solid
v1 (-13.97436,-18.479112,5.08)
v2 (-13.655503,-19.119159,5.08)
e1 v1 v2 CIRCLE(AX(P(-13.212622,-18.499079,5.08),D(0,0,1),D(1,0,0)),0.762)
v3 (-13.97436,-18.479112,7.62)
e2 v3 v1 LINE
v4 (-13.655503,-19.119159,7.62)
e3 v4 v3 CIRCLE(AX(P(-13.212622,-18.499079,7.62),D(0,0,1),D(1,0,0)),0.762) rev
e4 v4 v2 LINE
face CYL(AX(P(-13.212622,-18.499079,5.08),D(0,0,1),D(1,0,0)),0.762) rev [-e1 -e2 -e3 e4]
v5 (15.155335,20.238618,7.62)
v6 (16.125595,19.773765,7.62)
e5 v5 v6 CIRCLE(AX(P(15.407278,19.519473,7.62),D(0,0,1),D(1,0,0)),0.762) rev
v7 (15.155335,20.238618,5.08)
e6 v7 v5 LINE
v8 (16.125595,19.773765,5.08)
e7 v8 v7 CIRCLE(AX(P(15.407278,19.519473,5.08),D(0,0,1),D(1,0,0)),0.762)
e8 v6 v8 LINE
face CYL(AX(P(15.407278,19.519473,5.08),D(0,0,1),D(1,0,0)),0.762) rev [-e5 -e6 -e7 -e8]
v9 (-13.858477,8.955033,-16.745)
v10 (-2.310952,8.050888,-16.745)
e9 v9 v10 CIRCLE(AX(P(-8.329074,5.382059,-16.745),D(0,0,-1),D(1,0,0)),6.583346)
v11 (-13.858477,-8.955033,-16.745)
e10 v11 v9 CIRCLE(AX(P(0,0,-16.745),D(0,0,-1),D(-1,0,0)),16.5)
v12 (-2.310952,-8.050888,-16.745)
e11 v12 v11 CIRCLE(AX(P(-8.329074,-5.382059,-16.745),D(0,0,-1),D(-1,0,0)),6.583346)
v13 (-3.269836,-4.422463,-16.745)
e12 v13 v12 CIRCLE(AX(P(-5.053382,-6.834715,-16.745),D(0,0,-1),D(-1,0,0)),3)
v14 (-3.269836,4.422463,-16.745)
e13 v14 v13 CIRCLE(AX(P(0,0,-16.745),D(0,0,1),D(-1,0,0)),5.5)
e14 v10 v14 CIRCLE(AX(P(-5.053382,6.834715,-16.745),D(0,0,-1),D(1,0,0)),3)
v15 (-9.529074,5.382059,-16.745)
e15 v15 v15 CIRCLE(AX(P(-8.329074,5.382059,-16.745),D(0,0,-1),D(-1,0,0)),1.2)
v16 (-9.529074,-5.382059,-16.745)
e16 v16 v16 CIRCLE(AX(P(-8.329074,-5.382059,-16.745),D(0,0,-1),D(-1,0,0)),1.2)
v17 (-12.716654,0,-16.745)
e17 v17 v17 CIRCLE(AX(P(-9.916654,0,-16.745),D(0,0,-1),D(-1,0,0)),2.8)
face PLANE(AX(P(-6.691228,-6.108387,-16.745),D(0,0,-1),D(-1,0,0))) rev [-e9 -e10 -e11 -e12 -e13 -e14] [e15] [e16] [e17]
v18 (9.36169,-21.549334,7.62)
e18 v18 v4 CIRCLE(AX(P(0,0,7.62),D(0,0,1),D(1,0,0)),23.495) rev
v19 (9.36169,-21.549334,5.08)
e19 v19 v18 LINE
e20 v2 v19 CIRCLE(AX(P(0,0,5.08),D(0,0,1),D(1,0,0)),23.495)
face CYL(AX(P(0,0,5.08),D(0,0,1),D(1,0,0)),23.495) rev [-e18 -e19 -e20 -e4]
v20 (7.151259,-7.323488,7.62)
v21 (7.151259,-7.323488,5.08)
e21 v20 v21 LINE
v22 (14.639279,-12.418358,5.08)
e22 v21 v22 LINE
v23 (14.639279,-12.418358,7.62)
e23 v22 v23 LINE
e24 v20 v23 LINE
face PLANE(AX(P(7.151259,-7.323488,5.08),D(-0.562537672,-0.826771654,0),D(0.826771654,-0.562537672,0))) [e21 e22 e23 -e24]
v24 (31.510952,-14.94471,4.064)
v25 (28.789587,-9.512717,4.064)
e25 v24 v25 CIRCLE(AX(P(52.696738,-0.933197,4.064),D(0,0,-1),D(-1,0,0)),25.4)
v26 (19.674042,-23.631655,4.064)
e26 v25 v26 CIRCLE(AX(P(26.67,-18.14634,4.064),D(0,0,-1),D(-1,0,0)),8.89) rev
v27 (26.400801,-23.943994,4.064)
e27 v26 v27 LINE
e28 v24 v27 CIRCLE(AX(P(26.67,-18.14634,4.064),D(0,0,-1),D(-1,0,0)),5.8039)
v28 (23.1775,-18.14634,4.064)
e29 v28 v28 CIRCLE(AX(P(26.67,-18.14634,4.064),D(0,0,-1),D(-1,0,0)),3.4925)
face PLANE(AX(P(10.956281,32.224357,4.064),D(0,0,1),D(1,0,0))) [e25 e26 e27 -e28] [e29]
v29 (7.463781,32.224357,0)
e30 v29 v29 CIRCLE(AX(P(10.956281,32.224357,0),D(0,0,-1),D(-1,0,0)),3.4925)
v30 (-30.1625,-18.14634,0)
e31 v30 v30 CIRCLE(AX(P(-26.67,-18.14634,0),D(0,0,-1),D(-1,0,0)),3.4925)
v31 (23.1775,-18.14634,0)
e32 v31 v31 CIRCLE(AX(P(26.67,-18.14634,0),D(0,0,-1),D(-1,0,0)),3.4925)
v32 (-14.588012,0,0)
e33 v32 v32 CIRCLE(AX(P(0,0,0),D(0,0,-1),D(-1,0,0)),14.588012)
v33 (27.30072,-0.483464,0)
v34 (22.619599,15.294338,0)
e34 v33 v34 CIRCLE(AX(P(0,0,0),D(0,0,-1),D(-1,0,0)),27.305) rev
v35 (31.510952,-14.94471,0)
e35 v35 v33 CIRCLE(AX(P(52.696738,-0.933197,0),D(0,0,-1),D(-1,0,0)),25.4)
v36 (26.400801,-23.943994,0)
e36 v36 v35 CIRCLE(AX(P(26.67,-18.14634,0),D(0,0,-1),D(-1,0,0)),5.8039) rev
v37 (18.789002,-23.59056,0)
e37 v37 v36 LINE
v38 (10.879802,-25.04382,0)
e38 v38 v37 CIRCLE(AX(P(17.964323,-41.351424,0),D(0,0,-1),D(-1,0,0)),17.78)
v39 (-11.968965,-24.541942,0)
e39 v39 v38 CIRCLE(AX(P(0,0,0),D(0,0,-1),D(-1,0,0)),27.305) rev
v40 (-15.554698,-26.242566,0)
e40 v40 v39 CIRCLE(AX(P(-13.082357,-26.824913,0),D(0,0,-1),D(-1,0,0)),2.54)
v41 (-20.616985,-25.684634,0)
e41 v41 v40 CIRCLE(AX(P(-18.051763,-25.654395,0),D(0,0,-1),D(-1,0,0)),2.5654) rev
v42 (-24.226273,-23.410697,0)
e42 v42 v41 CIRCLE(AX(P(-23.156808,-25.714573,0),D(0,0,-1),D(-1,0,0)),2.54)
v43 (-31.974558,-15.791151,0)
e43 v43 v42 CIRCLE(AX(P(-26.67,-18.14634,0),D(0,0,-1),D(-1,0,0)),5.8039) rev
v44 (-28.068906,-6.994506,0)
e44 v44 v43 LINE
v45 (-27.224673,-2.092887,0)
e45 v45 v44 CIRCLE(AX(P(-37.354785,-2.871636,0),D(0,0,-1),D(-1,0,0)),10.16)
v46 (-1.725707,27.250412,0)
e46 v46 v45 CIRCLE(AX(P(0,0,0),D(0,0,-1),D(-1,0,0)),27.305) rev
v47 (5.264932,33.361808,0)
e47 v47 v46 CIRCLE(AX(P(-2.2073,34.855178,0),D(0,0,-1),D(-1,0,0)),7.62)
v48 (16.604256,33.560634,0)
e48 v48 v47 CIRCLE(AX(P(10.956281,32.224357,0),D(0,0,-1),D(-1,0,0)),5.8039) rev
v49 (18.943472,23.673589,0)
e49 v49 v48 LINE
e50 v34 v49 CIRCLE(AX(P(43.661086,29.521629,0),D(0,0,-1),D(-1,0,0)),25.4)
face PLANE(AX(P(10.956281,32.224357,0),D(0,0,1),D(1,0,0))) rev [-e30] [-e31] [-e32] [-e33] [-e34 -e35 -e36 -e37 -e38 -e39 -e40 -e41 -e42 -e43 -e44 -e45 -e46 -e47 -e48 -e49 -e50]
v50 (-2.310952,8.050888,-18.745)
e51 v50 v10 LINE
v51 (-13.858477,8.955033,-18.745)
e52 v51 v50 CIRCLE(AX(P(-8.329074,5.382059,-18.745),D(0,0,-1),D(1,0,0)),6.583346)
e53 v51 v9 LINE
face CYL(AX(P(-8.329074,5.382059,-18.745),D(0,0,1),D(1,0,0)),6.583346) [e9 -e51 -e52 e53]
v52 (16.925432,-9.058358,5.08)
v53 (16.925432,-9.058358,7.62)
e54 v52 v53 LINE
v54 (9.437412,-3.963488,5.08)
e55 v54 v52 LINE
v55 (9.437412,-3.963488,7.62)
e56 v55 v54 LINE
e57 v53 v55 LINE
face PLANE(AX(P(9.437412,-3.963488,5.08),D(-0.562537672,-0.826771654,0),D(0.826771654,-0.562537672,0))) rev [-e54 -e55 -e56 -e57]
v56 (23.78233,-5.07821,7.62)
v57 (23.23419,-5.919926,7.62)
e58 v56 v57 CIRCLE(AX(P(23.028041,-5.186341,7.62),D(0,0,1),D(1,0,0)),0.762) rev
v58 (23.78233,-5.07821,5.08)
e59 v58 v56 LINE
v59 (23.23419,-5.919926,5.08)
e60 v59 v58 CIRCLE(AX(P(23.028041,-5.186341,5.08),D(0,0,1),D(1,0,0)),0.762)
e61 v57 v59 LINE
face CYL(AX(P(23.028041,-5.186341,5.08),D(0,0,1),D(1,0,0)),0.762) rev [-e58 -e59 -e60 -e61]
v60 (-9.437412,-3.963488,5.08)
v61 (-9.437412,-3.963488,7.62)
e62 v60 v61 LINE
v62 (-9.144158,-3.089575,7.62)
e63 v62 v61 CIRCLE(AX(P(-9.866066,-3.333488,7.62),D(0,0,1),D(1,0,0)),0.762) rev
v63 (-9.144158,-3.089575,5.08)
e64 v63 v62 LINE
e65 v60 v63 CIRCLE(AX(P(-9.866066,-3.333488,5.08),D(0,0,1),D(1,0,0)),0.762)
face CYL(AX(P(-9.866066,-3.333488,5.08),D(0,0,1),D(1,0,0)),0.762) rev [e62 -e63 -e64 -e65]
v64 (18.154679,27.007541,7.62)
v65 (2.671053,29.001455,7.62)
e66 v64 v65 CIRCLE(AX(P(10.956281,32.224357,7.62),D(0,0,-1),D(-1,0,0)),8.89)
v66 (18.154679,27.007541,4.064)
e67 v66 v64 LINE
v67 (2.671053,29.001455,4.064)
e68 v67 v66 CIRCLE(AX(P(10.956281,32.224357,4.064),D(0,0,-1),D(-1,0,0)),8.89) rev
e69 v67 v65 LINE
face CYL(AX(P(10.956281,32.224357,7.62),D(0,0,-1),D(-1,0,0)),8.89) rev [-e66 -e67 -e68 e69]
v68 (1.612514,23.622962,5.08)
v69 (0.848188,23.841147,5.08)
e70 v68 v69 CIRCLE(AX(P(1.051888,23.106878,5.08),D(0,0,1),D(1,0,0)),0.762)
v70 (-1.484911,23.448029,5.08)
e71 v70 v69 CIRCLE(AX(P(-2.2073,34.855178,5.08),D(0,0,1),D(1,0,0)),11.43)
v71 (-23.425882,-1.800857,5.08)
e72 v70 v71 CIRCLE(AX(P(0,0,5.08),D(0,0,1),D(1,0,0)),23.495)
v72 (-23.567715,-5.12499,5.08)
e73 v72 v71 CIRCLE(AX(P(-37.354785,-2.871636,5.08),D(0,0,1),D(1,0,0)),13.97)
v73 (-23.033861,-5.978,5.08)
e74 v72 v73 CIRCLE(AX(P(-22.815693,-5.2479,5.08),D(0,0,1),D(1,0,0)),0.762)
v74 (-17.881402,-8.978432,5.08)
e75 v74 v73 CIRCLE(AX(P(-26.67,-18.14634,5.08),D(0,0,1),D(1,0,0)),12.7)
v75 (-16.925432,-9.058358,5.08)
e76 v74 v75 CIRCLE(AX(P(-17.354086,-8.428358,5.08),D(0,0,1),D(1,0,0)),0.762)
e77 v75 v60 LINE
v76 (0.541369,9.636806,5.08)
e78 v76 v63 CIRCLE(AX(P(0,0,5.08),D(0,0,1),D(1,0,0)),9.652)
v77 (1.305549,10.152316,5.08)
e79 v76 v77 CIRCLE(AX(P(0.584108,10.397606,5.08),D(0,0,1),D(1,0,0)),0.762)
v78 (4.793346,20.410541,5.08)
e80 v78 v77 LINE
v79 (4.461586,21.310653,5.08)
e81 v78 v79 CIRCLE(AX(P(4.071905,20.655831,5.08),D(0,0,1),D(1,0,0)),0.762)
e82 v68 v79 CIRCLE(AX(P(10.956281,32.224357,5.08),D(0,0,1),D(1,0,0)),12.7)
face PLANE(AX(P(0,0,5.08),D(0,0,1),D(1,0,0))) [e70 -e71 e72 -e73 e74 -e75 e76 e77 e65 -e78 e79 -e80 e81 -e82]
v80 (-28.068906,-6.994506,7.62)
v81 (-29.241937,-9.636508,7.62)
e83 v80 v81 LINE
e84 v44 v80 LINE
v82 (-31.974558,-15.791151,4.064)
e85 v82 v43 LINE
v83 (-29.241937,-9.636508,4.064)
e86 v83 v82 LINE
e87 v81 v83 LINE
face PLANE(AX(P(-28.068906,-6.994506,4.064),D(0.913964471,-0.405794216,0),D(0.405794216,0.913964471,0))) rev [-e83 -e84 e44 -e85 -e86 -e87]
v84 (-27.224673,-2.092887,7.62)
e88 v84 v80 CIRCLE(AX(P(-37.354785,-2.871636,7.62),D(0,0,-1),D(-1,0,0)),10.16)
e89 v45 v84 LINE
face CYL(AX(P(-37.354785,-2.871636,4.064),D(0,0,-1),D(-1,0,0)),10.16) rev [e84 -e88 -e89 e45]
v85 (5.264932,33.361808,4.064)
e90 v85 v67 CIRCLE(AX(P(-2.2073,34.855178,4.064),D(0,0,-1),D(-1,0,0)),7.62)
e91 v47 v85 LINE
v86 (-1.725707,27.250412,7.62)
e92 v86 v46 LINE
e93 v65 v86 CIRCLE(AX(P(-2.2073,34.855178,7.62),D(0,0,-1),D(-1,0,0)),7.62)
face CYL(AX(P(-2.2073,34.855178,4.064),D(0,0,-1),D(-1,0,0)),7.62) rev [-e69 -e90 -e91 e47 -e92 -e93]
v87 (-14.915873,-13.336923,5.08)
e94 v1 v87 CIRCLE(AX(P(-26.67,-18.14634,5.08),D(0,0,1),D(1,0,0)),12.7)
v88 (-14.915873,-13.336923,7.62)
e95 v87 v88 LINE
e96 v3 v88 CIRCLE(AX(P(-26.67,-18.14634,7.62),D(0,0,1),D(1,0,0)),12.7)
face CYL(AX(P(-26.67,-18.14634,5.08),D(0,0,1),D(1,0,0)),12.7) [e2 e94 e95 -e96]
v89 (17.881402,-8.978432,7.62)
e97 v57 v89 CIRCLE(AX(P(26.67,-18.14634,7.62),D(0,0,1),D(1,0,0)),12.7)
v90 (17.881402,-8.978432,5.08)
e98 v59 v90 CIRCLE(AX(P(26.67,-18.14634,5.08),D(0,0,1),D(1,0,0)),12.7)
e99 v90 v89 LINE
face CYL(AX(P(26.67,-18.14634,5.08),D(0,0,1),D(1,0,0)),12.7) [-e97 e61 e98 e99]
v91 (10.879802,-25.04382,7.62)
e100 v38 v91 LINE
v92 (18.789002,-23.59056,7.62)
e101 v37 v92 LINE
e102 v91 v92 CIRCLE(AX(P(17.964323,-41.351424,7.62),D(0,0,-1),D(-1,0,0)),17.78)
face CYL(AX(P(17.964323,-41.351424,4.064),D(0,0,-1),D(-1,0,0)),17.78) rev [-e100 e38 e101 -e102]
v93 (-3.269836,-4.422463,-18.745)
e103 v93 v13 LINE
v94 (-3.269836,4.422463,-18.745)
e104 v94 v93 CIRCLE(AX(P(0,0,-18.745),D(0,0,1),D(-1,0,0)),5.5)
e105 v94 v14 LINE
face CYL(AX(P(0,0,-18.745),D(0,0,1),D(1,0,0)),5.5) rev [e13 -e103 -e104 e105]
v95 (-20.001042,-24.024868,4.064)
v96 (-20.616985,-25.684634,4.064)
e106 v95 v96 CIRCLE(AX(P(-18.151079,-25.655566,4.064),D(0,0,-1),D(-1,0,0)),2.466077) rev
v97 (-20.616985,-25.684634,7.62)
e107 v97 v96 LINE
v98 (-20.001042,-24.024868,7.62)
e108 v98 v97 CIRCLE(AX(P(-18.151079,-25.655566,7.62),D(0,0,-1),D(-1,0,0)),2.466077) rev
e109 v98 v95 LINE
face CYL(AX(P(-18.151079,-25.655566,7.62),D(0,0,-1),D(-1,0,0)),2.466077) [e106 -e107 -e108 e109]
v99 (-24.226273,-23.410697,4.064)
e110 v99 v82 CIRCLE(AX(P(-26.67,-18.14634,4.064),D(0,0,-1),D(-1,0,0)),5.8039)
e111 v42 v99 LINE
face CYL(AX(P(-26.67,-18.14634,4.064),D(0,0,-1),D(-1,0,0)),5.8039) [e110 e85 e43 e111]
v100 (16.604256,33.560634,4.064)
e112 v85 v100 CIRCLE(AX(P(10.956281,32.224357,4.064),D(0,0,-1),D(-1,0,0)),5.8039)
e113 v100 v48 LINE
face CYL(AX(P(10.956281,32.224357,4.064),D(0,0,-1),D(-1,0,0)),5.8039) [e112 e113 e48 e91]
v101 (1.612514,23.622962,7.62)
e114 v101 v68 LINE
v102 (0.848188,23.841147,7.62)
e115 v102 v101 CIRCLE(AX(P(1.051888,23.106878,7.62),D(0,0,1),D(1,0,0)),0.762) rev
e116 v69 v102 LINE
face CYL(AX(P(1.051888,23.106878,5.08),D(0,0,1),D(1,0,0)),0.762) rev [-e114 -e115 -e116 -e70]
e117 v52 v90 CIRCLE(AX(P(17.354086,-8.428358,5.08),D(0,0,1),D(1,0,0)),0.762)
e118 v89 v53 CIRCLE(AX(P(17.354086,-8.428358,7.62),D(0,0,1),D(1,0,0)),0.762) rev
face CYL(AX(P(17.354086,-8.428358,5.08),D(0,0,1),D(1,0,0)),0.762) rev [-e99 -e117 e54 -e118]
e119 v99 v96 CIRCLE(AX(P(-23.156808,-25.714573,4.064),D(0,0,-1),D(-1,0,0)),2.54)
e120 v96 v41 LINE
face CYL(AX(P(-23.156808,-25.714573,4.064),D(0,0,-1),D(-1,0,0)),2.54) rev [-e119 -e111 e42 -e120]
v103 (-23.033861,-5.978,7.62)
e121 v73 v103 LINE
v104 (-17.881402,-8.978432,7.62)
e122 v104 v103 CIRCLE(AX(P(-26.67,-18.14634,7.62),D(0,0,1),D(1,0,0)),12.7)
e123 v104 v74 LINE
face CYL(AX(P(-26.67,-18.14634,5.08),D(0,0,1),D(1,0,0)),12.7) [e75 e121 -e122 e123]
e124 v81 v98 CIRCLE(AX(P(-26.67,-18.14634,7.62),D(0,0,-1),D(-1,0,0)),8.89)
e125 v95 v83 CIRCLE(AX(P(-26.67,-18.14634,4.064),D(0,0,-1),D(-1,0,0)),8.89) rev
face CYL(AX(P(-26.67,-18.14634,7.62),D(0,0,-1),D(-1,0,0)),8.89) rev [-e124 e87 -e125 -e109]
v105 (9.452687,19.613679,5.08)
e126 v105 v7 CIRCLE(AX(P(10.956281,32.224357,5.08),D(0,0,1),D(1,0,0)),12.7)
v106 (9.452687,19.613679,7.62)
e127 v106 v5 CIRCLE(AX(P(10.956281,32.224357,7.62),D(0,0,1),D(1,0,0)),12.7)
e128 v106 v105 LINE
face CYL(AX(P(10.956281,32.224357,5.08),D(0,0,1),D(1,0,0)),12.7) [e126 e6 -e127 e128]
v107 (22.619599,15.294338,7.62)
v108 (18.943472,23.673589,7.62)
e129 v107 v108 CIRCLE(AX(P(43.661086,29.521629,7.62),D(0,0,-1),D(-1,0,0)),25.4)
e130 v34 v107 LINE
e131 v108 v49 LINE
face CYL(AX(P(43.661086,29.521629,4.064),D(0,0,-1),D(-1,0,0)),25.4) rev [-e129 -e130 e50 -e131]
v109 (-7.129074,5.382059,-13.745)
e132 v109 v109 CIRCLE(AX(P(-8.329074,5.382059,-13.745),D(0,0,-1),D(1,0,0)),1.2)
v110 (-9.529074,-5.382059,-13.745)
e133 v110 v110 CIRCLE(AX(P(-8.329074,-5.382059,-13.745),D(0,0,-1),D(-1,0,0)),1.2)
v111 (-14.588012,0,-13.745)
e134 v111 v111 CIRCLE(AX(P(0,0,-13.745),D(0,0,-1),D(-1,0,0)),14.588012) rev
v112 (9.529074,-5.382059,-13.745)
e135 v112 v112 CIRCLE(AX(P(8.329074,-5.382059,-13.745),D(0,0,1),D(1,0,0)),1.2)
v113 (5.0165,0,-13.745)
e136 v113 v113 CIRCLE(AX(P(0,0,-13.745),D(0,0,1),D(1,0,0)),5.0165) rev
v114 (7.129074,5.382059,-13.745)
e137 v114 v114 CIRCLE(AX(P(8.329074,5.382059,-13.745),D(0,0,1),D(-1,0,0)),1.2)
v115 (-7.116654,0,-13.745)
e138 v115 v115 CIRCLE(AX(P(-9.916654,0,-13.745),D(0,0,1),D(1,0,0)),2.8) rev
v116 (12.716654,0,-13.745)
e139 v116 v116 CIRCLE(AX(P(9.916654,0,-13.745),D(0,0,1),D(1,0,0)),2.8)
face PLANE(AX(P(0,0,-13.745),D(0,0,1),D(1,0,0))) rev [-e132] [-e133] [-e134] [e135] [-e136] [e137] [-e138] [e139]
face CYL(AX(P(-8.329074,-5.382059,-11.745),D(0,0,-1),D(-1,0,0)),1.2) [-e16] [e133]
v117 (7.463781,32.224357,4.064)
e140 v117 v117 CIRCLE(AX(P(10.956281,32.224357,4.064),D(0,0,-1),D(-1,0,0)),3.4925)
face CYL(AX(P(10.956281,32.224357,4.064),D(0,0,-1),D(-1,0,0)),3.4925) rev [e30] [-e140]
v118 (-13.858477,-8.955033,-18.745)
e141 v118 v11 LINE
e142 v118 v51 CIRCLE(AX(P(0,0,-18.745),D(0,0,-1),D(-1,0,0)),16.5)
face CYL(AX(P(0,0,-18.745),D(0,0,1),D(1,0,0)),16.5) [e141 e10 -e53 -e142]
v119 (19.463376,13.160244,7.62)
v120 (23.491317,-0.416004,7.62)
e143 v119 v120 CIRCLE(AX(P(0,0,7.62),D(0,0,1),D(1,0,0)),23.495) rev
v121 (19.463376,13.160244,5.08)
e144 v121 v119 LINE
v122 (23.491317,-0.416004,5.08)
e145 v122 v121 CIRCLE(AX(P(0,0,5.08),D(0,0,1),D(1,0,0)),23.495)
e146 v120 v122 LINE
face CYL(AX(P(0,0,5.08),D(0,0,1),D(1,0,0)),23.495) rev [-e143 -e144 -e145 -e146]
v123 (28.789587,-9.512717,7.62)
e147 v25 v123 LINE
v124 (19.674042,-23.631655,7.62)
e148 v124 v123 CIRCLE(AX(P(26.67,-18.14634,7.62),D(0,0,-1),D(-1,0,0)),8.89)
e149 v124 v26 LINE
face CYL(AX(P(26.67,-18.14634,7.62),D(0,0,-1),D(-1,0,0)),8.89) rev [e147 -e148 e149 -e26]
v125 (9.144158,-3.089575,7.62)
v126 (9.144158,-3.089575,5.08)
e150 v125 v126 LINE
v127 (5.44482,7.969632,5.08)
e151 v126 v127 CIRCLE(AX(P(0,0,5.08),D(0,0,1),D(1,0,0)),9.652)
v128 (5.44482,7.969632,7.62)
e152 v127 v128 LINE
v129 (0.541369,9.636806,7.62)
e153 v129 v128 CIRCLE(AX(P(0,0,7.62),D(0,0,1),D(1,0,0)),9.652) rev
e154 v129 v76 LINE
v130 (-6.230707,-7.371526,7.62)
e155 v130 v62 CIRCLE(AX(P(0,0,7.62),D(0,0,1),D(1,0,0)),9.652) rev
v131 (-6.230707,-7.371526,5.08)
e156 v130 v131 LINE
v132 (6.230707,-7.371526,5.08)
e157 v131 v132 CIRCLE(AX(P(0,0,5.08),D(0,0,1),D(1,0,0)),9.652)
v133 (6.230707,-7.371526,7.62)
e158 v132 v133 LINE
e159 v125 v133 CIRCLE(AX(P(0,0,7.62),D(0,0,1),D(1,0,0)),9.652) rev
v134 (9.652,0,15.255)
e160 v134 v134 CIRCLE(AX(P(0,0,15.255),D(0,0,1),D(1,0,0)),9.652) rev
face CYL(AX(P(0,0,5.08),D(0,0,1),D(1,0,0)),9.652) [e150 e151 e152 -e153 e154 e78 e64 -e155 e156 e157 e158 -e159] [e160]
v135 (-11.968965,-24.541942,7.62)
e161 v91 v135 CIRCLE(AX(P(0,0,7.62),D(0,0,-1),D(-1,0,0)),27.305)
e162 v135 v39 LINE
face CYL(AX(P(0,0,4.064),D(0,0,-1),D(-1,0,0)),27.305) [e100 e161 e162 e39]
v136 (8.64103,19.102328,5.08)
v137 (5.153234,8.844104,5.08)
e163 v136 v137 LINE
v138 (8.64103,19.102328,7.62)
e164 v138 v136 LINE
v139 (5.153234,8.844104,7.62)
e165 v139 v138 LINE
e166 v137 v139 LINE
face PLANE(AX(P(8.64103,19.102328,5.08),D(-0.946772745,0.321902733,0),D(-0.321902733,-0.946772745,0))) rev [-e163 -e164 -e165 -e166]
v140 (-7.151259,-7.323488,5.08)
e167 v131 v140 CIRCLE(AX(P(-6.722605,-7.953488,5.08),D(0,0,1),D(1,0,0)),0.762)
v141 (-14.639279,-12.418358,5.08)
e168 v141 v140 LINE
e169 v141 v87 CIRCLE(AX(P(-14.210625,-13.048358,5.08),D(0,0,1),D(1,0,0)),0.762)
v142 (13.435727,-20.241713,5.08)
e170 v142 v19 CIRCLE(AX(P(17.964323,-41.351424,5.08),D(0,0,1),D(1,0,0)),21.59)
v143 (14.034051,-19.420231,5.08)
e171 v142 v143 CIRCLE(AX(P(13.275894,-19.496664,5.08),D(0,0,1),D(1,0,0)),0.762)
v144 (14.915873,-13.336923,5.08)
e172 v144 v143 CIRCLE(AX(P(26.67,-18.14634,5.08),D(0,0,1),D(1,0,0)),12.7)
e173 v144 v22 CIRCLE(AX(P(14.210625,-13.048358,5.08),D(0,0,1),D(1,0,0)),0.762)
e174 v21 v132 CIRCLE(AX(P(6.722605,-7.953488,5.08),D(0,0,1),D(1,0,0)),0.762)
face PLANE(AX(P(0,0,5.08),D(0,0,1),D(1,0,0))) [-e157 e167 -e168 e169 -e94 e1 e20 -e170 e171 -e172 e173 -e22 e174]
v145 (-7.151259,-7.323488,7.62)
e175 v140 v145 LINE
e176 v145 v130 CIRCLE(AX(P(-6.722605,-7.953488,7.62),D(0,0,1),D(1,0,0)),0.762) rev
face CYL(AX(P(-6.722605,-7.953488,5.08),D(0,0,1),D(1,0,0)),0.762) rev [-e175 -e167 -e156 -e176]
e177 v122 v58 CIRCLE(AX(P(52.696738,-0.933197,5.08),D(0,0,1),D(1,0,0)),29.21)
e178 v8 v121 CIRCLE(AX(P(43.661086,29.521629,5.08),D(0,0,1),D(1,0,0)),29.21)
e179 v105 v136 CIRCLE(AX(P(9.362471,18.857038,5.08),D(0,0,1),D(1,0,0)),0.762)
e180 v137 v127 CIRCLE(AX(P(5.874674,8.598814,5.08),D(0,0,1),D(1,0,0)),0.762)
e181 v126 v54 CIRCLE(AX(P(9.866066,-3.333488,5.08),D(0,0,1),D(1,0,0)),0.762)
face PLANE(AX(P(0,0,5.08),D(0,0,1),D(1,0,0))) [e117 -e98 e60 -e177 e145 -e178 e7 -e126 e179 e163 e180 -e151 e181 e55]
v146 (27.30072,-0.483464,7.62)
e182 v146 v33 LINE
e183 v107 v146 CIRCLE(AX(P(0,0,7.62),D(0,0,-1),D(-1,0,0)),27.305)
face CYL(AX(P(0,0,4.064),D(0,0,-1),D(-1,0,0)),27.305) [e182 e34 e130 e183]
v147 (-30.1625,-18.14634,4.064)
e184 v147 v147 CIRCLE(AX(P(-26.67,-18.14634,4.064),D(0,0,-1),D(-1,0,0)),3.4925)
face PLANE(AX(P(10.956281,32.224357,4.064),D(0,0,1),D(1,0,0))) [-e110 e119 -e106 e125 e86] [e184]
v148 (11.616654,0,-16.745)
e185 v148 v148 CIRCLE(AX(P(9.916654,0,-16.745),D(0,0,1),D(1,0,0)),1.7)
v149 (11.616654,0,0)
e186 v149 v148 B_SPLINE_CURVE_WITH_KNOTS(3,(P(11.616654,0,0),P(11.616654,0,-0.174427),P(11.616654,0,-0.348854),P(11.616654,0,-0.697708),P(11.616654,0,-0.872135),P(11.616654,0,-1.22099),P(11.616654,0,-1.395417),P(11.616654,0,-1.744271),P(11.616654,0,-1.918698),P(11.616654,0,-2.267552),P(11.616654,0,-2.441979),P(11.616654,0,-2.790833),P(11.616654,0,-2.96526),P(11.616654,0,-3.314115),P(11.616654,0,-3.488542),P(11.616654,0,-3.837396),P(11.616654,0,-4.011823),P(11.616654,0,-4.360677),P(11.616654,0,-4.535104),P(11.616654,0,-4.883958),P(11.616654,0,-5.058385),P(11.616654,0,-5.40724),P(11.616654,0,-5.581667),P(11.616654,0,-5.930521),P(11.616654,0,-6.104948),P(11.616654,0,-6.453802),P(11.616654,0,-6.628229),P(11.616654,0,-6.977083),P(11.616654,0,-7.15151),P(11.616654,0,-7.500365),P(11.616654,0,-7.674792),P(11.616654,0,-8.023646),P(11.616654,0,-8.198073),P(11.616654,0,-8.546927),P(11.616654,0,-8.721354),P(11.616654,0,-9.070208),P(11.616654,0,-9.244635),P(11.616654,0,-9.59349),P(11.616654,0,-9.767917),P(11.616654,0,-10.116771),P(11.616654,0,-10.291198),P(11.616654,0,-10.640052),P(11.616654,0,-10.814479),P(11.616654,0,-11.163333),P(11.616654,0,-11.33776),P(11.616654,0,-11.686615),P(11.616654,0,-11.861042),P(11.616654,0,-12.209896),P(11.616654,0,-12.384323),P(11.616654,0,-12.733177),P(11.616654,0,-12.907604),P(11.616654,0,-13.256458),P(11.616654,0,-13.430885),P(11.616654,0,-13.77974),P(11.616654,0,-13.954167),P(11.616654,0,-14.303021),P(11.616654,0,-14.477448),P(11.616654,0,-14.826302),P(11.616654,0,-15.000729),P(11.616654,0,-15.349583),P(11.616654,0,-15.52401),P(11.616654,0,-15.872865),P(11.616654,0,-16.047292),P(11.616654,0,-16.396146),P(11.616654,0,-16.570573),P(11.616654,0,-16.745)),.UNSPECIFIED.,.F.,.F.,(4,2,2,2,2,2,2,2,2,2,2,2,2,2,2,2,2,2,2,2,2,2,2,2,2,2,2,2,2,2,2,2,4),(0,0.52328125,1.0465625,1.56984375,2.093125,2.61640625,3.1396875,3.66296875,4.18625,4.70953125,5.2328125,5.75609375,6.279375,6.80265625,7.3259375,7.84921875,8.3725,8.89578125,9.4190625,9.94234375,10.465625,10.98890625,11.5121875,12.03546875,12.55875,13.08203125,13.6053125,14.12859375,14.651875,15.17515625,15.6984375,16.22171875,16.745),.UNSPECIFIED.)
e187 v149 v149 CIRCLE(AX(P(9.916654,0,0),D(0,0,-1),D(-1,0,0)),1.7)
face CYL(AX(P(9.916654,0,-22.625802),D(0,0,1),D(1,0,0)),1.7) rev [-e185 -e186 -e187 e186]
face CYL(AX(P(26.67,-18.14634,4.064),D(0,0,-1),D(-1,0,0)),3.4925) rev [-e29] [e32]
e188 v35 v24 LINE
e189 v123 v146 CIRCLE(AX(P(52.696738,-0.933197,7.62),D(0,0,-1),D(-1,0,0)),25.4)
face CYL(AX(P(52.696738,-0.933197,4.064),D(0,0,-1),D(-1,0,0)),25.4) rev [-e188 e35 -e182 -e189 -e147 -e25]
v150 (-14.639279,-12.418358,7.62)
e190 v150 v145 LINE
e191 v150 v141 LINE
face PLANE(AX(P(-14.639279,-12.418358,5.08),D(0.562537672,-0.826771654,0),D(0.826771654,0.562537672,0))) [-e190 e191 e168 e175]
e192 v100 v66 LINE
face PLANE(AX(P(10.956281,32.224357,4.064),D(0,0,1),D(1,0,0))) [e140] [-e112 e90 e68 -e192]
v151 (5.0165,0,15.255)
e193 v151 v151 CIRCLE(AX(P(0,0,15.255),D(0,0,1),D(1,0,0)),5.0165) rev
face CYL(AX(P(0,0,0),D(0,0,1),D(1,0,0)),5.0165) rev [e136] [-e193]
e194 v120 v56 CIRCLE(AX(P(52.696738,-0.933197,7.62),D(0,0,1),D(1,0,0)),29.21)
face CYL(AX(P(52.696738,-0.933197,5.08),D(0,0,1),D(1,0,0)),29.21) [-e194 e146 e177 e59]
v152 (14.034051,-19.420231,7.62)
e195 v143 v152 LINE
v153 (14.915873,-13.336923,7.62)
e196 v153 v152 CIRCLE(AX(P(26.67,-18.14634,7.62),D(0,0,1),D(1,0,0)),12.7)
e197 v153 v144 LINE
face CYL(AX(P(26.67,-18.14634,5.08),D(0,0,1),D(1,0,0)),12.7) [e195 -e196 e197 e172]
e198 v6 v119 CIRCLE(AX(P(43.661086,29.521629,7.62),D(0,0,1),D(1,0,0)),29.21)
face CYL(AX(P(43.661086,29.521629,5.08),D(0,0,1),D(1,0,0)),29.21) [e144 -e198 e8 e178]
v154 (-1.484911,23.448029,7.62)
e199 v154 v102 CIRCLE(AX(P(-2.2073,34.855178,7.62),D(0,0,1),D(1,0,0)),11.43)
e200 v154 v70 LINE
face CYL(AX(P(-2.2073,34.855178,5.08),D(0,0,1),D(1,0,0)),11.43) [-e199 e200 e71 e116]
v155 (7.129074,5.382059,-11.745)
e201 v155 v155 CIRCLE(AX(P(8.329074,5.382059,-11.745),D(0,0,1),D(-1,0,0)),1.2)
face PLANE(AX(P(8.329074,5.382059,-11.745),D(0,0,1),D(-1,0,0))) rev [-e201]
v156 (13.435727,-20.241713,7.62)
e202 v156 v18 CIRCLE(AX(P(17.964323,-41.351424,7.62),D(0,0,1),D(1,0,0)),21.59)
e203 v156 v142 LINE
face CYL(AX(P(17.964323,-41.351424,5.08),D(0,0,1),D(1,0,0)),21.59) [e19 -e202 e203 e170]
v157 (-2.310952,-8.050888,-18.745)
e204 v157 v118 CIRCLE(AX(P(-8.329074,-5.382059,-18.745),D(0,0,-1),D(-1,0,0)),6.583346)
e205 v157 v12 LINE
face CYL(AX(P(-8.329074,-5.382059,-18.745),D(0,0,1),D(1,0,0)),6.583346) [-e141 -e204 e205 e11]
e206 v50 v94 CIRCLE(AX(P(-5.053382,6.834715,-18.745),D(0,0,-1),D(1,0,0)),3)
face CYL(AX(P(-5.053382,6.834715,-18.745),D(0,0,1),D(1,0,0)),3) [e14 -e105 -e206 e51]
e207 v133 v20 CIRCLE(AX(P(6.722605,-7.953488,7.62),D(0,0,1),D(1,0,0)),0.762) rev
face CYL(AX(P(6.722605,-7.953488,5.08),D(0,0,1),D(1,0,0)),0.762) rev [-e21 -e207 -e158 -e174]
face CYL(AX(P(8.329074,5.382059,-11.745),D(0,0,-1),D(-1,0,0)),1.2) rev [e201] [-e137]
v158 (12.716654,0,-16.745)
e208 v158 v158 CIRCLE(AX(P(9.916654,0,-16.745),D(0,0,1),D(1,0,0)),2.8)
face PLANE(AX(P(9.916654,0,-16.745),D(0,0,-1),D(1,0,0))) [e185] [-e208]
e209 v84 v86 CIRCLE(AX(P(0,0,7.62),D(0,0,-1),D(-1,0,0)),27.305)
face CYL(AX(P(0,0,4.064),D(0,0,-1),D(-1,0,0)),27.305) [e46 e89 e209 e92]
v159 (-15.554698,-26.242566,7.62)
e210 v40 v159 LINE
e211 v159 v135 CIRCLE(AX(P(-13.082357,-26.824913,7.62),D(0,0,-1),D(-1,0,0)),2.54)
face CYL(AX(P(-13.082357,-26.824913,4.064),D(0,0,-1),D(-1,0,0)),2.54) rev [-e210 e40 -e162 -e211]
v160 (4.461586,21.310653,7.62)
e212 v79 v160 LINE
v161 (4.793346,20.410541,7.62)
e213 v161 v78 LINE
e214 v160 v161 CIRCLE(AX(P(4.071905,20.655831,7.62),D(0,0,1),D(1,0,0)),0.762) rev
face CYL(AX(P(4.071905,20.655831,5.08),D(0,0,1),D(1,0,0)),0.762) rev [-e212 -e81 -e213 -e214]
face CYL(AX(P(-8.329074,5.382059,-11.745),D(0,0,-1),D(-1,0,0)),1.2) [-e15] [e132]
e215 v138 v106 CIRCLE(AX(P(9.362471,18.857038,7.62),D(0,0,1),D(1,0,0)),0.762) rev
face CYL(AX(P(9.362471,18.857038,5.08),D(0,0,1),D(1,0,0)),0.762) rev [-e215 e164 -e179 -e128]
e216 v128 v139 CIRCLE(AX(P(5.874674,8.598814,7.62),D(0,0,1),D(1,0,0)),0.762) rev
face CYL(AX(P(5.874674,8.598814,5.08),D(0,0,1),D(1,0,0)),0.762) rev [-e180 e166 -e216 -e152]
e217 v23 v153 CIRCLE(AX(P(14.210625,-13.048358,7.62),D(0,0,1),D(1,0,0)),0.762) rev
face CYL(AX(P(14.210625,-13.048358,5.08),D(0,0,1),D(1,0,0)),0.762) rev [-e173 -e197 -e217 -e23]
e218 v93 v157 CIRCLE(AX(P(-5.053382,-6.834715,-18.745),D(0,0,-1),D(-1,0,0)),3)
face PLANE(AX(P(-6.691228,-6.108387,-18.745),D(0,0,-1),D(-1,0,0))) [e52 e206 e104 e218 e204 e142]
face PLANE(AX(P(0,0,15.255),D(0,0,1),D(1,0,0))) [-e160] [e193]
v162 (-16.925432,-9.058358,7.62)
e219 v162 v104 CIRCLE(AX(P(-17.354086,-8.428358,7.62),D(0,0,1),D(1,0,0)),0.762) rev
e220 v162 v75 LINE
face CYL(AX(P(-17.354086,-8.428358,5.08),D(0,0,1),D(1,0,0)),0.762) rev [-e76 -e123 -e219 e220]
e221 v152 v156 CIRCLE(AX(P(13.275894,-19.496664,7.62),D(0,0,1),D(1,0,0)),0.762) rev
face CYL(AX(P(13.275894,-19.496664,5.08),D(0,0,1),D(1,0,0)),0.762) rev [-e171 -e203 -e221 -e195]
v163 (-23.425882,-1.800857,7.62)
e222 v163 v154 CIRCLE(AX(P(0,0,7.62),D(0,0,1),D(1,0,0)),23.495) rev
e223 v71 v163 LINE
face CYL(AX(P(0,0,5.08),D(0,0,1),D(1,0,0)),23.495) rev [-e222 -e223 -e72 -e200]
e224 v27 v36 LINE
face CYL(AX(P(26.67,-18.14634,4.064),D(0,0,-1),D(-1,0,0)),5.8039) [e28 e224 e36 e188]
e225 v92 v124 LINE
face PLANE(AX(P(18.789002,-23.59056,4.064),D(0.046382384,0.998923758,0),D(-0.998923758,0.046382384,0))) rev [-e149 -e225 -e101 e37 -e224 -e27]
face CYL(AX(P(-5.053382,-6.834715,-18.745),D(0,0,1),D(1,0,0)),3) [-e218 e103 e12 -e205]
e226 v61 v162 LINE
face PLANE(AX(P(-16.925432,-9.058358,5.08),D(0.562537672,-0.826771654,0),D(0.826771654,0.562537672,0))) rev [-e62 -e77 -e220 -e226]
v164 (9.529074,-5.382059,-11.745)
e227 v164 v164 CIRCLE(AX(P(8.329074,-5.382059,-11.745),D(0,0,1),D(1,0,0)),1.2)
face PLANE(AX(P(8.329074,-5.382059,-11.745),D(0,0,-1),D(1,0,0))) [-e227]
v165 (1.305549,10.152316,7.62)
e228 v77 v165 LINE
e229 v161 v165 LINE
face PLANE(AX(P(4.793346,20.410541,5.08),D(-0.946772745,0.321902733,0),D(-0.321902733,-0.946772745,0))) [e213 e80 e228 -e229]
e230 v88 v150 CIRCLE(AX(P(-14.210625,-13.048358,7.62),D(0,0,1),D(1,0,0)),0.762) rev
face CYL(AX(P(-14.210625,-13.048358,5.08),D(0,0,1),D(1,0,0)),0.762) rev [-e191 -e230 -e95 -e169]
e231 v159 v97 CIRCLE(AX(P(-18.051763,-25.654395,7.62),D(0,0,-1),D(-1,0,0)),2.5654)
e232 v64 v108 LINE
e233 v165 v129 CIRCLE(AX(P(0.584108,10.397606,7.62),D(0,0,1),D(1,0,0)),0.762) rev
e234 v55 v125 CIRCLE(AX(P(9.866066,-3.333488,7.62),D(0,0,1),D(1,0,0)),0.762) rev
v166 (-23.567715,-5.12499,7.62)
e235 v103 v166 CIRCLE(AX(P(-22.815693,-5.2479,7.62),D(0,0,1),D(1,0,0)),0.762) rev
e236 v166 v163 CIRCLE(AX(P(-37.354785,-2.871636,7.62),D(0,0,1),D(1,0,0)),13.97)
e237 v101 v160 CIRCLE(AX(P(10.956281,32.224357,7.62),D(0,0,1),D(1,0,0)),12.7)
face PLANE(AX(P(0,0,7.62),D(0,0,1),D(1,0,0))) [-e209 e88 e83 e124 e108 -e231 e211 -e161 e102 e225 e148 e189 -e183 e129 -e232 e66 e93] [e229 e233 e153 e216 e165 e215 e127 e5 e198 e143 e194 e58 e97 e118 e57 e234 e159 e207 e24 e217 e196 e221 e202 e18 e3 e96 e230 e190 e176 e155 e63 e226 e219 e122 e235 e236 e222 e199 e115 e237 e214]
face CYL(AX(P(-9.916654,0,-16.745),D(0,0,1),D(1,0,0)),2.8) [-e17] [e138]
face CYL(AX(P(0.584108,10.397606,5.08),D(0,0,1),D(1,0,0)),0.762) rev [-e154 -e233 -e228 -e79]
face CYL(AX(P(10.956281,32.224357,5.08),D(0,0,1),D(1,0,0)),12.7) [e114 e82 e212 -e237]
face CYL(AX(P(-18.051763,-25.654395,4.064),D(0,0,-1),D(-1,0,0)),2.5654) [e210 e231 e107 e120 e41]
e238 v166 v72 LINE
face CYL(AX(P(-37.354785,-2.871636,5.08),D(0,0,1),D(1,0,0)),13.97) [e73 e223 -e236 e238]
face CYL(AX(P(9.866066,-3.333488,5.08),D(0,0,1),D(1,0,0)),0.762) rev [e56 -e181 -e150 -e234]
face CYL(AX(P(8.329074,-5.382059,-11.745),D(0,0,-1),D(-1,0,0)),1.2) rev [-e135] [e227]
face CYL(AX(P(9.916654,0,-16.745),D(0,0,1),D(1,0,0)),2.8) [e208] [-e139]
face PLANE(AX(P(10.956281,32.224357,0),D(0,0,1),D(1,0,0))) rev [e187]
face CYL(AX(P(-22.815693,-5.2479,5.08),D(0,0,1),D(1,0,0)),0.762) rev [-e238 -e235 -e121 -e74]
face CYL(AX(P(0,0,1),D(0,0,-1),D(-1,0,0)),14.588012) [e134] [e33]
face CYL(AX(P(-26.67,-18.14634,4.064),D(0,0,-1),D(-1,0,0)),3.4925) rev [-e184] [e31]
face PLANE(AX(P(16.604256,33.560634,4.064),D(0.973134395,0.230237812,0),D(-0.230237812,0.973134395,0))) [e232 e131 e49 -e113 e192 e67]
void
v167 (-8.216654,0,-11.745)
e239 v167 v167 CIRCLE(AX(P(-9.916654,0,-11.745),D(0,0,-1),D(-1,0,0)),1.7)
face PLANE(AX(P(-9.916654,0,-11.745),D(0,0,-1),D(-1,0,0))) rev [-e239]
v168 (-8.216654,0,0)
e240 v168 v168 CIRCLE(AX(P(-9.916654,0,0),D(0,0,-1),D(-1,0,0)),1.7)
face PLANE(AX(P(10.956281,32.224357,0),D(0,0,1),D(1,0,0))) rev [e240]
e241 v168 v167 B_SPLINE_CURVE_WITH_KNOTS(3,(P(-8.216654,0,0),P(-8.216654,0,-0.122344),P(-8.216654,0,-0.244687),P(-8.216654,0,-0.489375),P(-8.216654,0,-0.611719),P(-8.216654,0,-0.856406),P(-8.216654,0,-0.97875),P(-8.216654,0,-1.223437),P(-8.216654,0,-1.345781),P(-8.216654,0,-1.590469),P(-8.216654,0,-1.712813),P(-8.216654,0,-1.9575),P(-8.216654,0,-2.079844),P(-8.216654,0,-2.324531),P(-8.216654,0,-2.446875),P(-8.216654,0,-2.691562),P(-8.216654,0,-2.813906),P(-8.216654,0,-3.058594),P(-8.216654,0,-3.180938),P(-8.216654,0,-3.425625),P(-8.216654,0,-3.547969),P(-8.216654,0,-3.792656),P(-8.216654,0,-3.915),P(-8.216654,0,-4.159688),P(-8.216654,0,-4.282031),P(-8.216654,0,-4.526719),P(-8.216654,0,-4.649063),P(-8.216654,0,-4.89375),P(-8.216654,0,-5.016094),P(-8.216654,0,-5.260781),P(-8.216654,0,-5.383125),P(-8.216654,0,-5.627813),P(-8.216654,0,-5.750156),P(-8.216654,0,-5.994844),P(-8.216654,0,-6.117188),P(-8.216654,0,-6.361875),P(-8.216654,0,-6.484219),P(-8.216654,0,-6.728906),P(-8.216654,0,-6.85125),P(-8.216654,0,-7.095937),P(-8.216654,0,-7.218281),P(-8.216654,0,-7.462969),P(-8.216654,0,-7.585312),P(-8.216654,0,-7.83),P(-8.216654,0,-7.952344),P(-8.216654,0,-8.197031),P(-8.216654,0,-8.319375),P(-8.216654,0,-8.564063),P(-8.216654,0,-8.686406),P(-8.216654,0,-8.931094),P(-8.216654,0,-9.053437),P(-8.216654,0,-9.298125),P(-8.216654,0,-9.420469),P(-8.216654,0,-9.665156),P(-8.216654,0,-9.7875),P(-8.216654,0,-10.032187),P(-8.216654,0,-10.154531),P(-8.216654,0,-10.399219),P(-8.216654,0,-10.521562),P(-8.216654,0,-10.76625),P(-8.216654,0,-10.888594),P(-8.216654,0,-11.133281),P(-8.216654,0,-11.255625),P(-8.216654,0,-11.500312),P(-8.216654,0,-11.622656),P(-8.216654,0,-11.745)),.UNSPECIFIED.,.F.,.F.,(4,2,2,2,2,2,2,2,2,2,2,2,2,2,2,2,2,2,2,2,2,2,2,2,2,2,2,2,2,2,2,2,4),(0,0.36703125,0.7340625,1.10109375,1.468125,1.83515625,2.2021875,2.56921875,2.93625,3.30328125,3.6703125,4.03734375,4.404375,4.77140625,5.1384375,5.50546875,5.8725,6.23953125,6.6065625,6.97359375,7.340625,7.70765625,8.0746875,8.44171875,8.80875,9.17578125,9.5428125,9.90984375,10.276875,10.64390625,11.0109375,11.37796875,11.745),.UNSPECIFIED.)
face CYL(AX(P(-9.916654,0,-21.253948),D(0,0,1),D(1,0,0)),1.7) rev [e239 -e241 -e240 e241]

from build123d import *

# Parameters (mm, degrees)
EXTRUDE_START           = -5.08
EXTRUDE_1_OUTLINE_R     = 5.0165
EXTRUDE_1_DEPTH         = 5.08
EXTRUDE_1_2_OUTLINE_R   = 14.588011588
EXTRUDE_1_2_OUTLINE_R_2 = 2.268804718
EXTRUDE_1_2_OUTLINE_R_3 = 5.0165
EXTRUDE_1_2_OUTLINE_R_4 = 1.7
EXTRUDE_1_2_DEPTH       = 13.745
EXTRUDE_START_2         = -7.62
EXTRUDE_1_3_OUTLINE_R   = 5.0165
EXTRUDE_1_3_DEPTH       = 2.54
EXTRUDE_START_3         = -15.255
EXTRUDE_1_4_OUTLINE_R   = 9.652
EXTRUDE_1_4_OUTLINE_R_2 = 5.0165
EXTRUDE_1_4_DEPTH       = 7.635
EXTRUDE_START_4         = -4.064
EXTRUDE_1_5_OUTLINE_R   = 3.4925
EXTRUDE_1_5_DEPTH       = 4.064
SKETCH_2_R              = 3.139837575
SKETCH_2_R_2            = 1.7
EXTRUDE_2_DEPTH         = 13.745
SKETCH_3_R              = 1.2
CUT_EXTRUDE_1_DEPTH     = 2
SKETCH_4_R              = 2.8
SKETCH_4_R_2            = 1.7
EXTRUDE_3_DEPTH         = 3
SKETCH_5_R              = 1.7
SKETCH_5_R_2            = 1.2
EXTRUDE_4_DEPTH         = 5
EXTRUDE_5_DEPTH         = 2


with BuildPart() as part:
    # 凸台-拉伸1: read off the stored shape, not the designer's step
    # 凸台-拉伸1 outline → 凸台-拉伸1 (new body)
    with BuildSketch(Plane(origin=(0, 0, 0), x_dir=(-1, 0, 0), z_dir=(0, 0, -1)).offset(EXTRUDE_START)):
        with BuildLine():
            ThreePointArc((20.001041548, -24.024868384), (19.189851545, -13.342229592), (29.241937464, -9.636508412))
            Line((29.241937464, -9.636508412), (28.068905544, -6.994505511))
            ThreePointArc((28.068905544, -6.994505511), (27.342210837, -4.596155707), (27.224673499, -2.092887453))
            ThreePointArc((27.224673499, -2.092887453), (20.610396453, 17.910180989), (1.725707135, 27.250412105))
            ThreePointArc((1.725707135, 27.250412105), (-0.612060573, 27.775940536), (-2.671053319, 29.001455474))
            ThreePointArc((-2.671053319, 29.001455474), (-9.820841475, 23.407165066), (-18.154679086, 27.007540952))
            Line((-18.154679086, 27.007540952), (-18.943472312, 23.673588932))
            ThreePointArc((-18.943472312, 23.673588932), (-20.401103388, 19.31706117), (-22.619598737, 15.294338102))
            ThreePointArc((-22.619598737, 15.294338102), (-26.177171365, 7.766513011), (-27.300719551, -0.483463539))
            ThreePointArc((-27.300719551, -0.483463539), (-27.635164342, -5.065694963), (-28.789587413, -9.512717058))
            ThreePointArc((-28.789587413, -9.512717058), (-19.201342403, -13.324384855), (-19.674042111, -23.631654559))
            Line((-19.674042111, -23.631654559), (-18.789002246, -23.590560073))
            ThreePointArc((-18.789002246, -23.590560073), (-14.751162948, -23.864172006), (-10.879801534, -25.043820467))
            ThreePointArc((-10.879801534, -25.043820467), (0.599616353, -27.298415434), (11.968964894, -24.54194174))
            ThreePointArc((11.968964894, -24.54194174), (14.170803819, -24.529943899), (15.554698359, -26.242566013))
            ThreePointArc((15.554698359, -26.242566013), (18.332802908, -28.204355062), (20.616984936, -25.68463412))
            ThreePointArc((20.616984936, -25.68463412), (20.463088042, -24.797573692), (20.001041548, -24.024868384))
        make_face()
        Circle(EXTRUDE_1_OUTLINE_R, mode=Mode.SUBTRACT)
    extrude(amount=EXTRUDE_1_DEPTH)

    # Extrude 1 2 outline → Extrude 1 2 (add)
    with BuildSketch(Plane(origin=(0, 0, 0), x_dir=(-1, 0, 0), z_dir=(0, 0, -1))):
        Circle(EXTRUDE_1_2_OUTLINE_R)
        with Locations((-9.916654285, 0)):
            Circle(EXTRUDE_1_2_OUTLINE_R_2, mode=Mode.SUBTRACT)
        Circle(EXTRUDE_1_2_OUTLINE_R_3, mode=Mode.SUBTRACT)
        with Locations((9.916654285, 0)):
            Circle(EXTRUDE_1_2_OUTLINE_R_4, mode=Mode.SUBTRACT)
    extrude(amount=EXTRUDE_1_2_DEPTH)

    # Extrude 1 3 outline → Extrude 1 3 (add)
    with BuildSketch(Plane(origin=(0, 0, 0), x_dir=(-1, 0, 0), z_dir=(0, 0, -1)).offset(EXTRUDE_START_2)):
        with BuildLine():
            ThreePointArc((20.001041548, -24.024868384), (19.189851545, -13.342229592), (29.241937464, -9.636508412))
            Line((29.241937464, -9.636508412), (28.068905544, -6.994505511))
            ThreePointArc((28.068905544, -6.994505511), (27.342210837, -4.596155707), (27.224673499, -2.092887453))
            ThreePointArc((27.224673499, -2.092887453), (20.610396453, 17.910180989), (1.725707135, 27.250412105))
            ThreePointArc((1.725707135, 27.250412105), (-0.612060573, 27.775940536), (-2.671053319, 29.001455474))
            ThreePointArc((-2.671053319, 29.001455474), (-9.820841475, 23.407165066), (-18.154679086, 27.007540952))
            Line((-18.154679086, 27.007540952), (-18.943472312, 23.673588932))
            ThreePointArc((-18.943472312, 23.673588932), (-20.401103388, 19.31706117), (-22.619598737, 15.294338102))
            ThreePointArc((-22.619598737, 15.294338102), (-26.177171365, 7.766513011), (-27.300719551, -0.483463539))
            ThreePointArc((-27.300719551, -0.483463539), (-27.635164342, -5.065694963), (-28.789587413, -9.512717058))
            ThreePointArc((-28.789587413, -9.512717058), (-19.201342403, -13.324384855), (-19.674042111, -23.631654559))
            Line((-19.674042111, -23.631654559), (-18.789002246, -23.590560073))
            ThreePointArc((-18.789002246, -23.590560073), (-14.751162948, -23.864172006), (-10.879801534, -25.043820467))
            ThreePointArc((-10.879801534, -25.043820467), (0.599616353, -27.298415434), (11.968964894, -24.54194174))
            ThreePointArc((11.968964894, -24.54194174), (14.170803819, -24.529943899), (15.554698359, -26.242566013))
            ThreePointArc((15.554698359, -26.242566013), (18.332802908, -28.204355062), (20.616984936, -25.68463412))
            ThreePointArc((20.616984936, -25.68463412), (20.463088042, -24.797573692), (20.001041548, -24.024868384))
        make_face()
        with BuildLine():
            Line((-9.437411967, -3.963488283), (-16.925432177, -9.058357516))
            ThreePointArc((-16.925432177, -9.058357516), (-17.41757272, -9.187708174), (-17.881401777, -8.978432009))
            ThreePointArc((-17.881401777, -8.978432009), (-20.369392498, -7.119448331), (-23.234189867, -5.919925851))
            ThreePointArc((-23.234189867, -5.919925851), (-23.66657971, -5.602168652), (-23.782330153, -5.07821021))
            ThreePointArc((-23.782330153, -5.07821021), (-23.543476187, -2.752933566), (-23.491316823, -0.41600351))
            ThreePointArc((-23.491316823, -0.41600351), (-22.524542802, 6.682813521), (-19.463375657, 13.160244413))
            ThreePointArc((-19.463375657, 13.160244413), (-17.583975546, 16.360762601), (-16.125595223, 19.773765426))
            ThreePointArc((-16.125595223, 19.773765426), (-15.736516696, 20.206674843), (-15.155334867, 20.23861769))
            ThreePointArc((-15.155334867, 20.23861769), (-12.339759376, 19.599936809), (-9.452686504, 19.613679036))
            ThreePointArc((-9.452686504, 19.613679036), (-8.956292025, 19.50175751), (-8.641029977, 19.102328233))
            Line((-8.641029977, 19.102328233), (-5.153233585, 8.844103551))
            ThreePointArc((-5.153233585, 8.844103551), (-5.151801591, 8.357776579), (-5.444820191, 7.96963218))
            ThreePointArc((-5.444820191, 7.96963218), (-9.153474063, 3.061864885), (-9.144158429, -3.089574506))
            ThreePointArc((-9.144158429, -3.089574506), (-9.143653777, -3.575903324), (-9.437411967, -3.963488283))
        make_face(mode=Mode.SUBTRACT)
        with BuildLine():
            ThreePointArc((-7.151258866, -7.323488283), (-6.682895498, -7.19252367), (-6.230707221, -7.371525726))
            ThreePointArc((-6.230707221, -7.371525726), (0, -9.652), (6.230707221, -7.371525726))
            ThreePointArc((6.230707221, -7.371525726), (6.682895498, -7.19252367), (7.151258866, -7.323488283))
            Line((7.151258866, -7.323488283), (14.639279076, -12.418357516))
            ThreePointArc((14.639279076, -12.418357516), (14.940264662, -12.828652024), (14.91587299, -13.336922575))
            ThreePointArc((14.91587299, -13.336922575), (14.177670379, -15.859049125), (13.97436048, -18.4791122))
            ThreePointArc((13.97436048, -18.4791122), (13.89467208, -18.838860561), (13.655503297, -19.119159362))
            ThreePointArc((13.655503297, -19.119159362), (2.466910188, -23.365131695), (-9.361689692, -21.54933389))
            ThreePointArc((-9.361689692, -21.54933389), (-11.36623515, -20.794349539), (-13.435727078, -20.241713106))
            ThreePointArc((-13.435727078, -20.241713106), (-13.891836222, -19.945284024), (-14.034051192, -19.420231022))
            ThreePointArc((-14.034051192, -19.420231022), (-14.101364036, -16.324420921), (-14.91587299, -13.336922575))
            ThreePointArc((-14.91587299, -13.336922575), (-14.940264662, -12.828652024), (-14.639279076, -12.418357516))
            Line((-14.639279076, -12.418357516), (-7.151258866, -7.323488283))
        make_face(mode=Mode.SUBTRACT)
        with BuildLine():
            Line((16.925432177, -9.058357516), (9.437411967, -3.963488283))
            ThreePointArc((9.437411967, -3.963488283), (9.143653777, -3.575903324), (9.144158429, -3.089574506))
            ThreePointArc((9.144158429, -3.089574506), (7.680637088, 5.845418541), (-0.541368686, 9.636805692))
            ThreePointArc((-0.541368686, 9.636805692), (-1.010249862, 9.765904167), (-1.30554915, 10.152316259))
            Line((-1.30554915, 10.152316259), (-4.793345542, 20.410540941))
            ThreePointArc((-4.793345542, 20.410540941), (-4.786886375, 20.919355432), (-4.461586411, 21.310653068))
            ThreePointArc((-4.461586411, 21.310653068), (-2.953099663, 22.36336928), (-1.612513688, 23.62296165))
            ThreePointArc((-1.612513688, 23.62296165), (-1.26105352, 23.839608177), (-0.848188408, 23.841146693))
            ThreePointArc((-0.848188408, 23.841146693), (0.308161985, 23.584056969), (1.484910791, 23.44802902))
            ThreePointArc((1.484910791, 23.44802902), (17.73452718, 15.411085967), (23.425881848, -1.800856645))
            ThreePointArc((23.425881848, -1.800856645), (23.397483591, -3.467160777), (23.567714628, -5.124989875))
            ThreePointArc((23.567714628, -5.124989875), (23.461621487, -5.65215236), (23.033860973, -5.978000458))
            ThreePointArc((23.033860973, -5.978000458), (20.279055523, -7.17155875), (17.881401777, -8.978432009))
            ThreePointArc((17.881401777, -8.978432009), (17.41757272, -9.187708174), (16.925432177, -9.058357516))
        make_face(mode=Mode.SUBTRACT)
        Circle(EXTRUDE_1_3_OUTLINE_R, mode=Mode.SUBTRACT)
    extrude(amount=EXTRUDE_1_3_DEPTH)

    # Extrude 1 4 outline → Extrude 1 4 (add)
    with BuildSketch(Plane(origin=(0, 0, 0), x_dir=(-1, 0, 0), z_dir=(0, 0, -1)).offset(EXTRUDE_START_3)):
        Circle(EXTRUDE_1_4_OUTLINE_R)
        Circle(EXTRUDE_1_4_OUTLINE_R_2, mode=Mode.SUBTRACT)
    extrude(amount=EXTRUDE_1_4_DEPTH)

    # Extrude 1 5 outline → Extrude 1 5 (add)
    # profile 1 of 3: a face of its own
    with BuildSketch(Plane(origin=(0, 0, 0), x_dir=(-1, 0, 0), z_dir=(0, 0, -1)).offset(EXTRUDE_START_4)):
        with BuildLine():
            Line((31.974558392, -15.791151184), (29.241937464, -9.636508412))
            ThreePointArc((29.241937464, -9.636508412), (19.189851545, -13.342229592), (20.001041548, -24.024868384))
            ThreePointArc((20.001041548, -24.024868384), (20.463088042, -24.797573692), (20.616984936, -25.68463412))
            ThreePointArc((20.616984936, -25.68463412), (21.802856471, -23.565523811), (24.226273175, -23.410697217))
            ThreePointArc((24.226273175, -23.410697217), (30.739454478, -22.284551863), (31.974558392, -15.791151184))
        make_face()
        with Locations((26.67, -18.146340237)):
            Circle(EXTRUDE_1_5_OUTLINE_R, mode=Mode.SUBTRACT)
    # profile 2 of 3: a face of its own
    with BuildSketch(Plane(origin=(0, 0, 0), x_dir=(-1, 0, 0), z_dir=(0, 0, -1)).offset(EXTRUDE_START_4)):
        with BuildLine():
            ThreePointArc((-18.154679086, 27.007540952), (-9.820841475, 23.407165066), (-2.671053319, 29.001455474))
            ThreePointArc((-2.671053319, 29.001455474), (-4.34154767, 30.95941179), (-5.264931729, 33.361807717))
            ThreePointArc((-5.264931729, 33.361807717), (-10.854529977, 38.027365143), (-16.604256141, 33.560634381))
            Line((-16.604256141, 33.560634381), (-18.154679086, 27.007540952))
        make_face()
        with Locations((-10.956281429, 32.224357143)):
            Circle(EXTRUDE_1_5_OUTLINE_R, mode=Mode.SUBTRACT)
    # profile 3 of 3: a face of its own
    with BuildSketch(Plane(origin=(0, 0, 0), x_dir=(-1, 0, 0), z_dir=(0, 0, -1)).offset(EXTRUDE_START_4)):
        with BuildLine():
            Line((-26.400801283, -23.943993837), (-19.674042111, -23.631654559))
            ThreePointArc((-19.674042111, -23.631654559), (-19.201342403, -13.324384855), (-28.789587413, -9.512717058))
            ThreePointArc((-28.789587413, -9.512717058), (-29.987271524, -12.310373526), (-31.510952034, -14.944709618))
            ThreePointArc((-31.510952034, -14.944709618), (-31.716980405, -21.01221602), (-26.400801283, -23.943993837))
        make_face()
        with Locations((-26.67, -18.146340237)):
            Circle(EXTRUDE_1_5_OUTLINE_R, mode=Mode.SUBTRACT)
    extrude(amount=EXTRUDE_1_5_DEPTH)

    # 草图2 → 凸台-拉伸2 (add)
    with BuildSketch(Plane(origin=(0, 0, 0), x_dir=(-1, 0, 0), z_dir=(0, 0, -1))):
        with Locations((-9.916654285, 0)):
            Circle(SKETCH_2_R)
        with Locations(Location((-9.916654285, 0, 0), (0, 0, 180))):
            Circle(SKETCH_2_R_2, mode=Mode.SUBTRACT)
    extrude(amount=EXTRUDE_2_DEPTH)

    # 草图3 → 切除-拉伸1 (cut)
    with BuildSketch(Plane(origin=(0, 0, -13.745), x_dir=(-1, 0, 0), z_dir=(0, 0, -1))):
        with Locations((8.32907413, -5.382058747)):
            Circle(SKETCH_3_R)
        with Locations(Location((8.32907413, 5.382058747, 0), (0, 0, 180))):
            Circle(SKETCH_3_R)
    cut_extrude_1 = extrude(amount=-CUT_EXTRUDE_1_DEPTH, mode=Mode.SUBTRACT)

    # 草图4 → 凸台-拉伸3 (add)
    with BuildSketch(Plane(origin=(0, 0, -13.745), x_dir=(-1, 0, 0), z_dir=(0, 0, -1))):
        with Locations(Location((9.916654285, 0, 0), (0, 0, 180))):
            Circle(SKETCH_4_R)
        with Locations(Location((9.916654285, 0, 0), (0, 0, 180))):
            Circle(SKETCH_4_R_2, mode=Mode.SUBTRACT)
    extrude_3 = extrude(amount=EXTRUDE_3_DEPTH)

    # 镜向1: 切除-拉伸1, 凸台-拉伸3 across plane
    add(cut_extrude_1.mirror(Plane(origin=(0, 0, 0), x_dir=(0, 0, 1), z_dir=(1, 0, 0))), mode=Mode.SUBTRACT)
    add(extrude_3.mirror(Plane(origin=(0, 0, 0), x_dir=(0, 0, 1), z_dir=(1, 0, 0))))

    # 草图5 → 凸台-拉伸4 (add)
    with BuildSketch(Plane(origin=(0, 0, -16.745), x_dir=(-1, 0, 0), z_dir=(0, 0, -1))):
        with Locations(Location((9.916654285, 0, 0), (0, 0, 180))):
            Circle(SKETCH_5_R)
        with Locations((8.32907413, -5.382058747)):
            Circle(SKETCH_5_R_2)
        with Locations((8.32907413, 5.382058747)):
            Circle(SKETCH_5_R_2)
    extrude(amount=-EXTRUDE_4_DEPTH)

    # 草图6 → 凸台-拉伸5 (add)
    with BuildSketch(Plane(origin=(0, 0, -16.745), x_dir=(-1, 0, 0), z_dir=(0, 0, -1))):
        with BuildLine():
            ThreePointArc((13.858476779, -8.955033298), (16.5, 0), (13.858476779, 8.955033298))
            ThreePointArc((13.858476779, 8.955033298), (7.815185626, 11.945317039), (2.310952159, 8.050887844))
            ThreePointArc((2.310952159, 8.050887844), (2.152954051, 6.068219054), (3.269835625, 4.422462548))
            ThreePointArc((3.269835625, 4.422462548), (5.5, 0), (3.269835625, -4.422462548))
            ThreePointArc((3.269835625, -4.422462548), (2.152954051, -6.068219054), (2.310952159, -8.050887844))
            ThreePointArc((2.310952159, -8.050887844), (7.815185626, -11.945317039), (13.858476779, -8.955033298))
        make_face()
    extrude(amount=EXTRUDE_5_DEPTH)


solid = part.part
